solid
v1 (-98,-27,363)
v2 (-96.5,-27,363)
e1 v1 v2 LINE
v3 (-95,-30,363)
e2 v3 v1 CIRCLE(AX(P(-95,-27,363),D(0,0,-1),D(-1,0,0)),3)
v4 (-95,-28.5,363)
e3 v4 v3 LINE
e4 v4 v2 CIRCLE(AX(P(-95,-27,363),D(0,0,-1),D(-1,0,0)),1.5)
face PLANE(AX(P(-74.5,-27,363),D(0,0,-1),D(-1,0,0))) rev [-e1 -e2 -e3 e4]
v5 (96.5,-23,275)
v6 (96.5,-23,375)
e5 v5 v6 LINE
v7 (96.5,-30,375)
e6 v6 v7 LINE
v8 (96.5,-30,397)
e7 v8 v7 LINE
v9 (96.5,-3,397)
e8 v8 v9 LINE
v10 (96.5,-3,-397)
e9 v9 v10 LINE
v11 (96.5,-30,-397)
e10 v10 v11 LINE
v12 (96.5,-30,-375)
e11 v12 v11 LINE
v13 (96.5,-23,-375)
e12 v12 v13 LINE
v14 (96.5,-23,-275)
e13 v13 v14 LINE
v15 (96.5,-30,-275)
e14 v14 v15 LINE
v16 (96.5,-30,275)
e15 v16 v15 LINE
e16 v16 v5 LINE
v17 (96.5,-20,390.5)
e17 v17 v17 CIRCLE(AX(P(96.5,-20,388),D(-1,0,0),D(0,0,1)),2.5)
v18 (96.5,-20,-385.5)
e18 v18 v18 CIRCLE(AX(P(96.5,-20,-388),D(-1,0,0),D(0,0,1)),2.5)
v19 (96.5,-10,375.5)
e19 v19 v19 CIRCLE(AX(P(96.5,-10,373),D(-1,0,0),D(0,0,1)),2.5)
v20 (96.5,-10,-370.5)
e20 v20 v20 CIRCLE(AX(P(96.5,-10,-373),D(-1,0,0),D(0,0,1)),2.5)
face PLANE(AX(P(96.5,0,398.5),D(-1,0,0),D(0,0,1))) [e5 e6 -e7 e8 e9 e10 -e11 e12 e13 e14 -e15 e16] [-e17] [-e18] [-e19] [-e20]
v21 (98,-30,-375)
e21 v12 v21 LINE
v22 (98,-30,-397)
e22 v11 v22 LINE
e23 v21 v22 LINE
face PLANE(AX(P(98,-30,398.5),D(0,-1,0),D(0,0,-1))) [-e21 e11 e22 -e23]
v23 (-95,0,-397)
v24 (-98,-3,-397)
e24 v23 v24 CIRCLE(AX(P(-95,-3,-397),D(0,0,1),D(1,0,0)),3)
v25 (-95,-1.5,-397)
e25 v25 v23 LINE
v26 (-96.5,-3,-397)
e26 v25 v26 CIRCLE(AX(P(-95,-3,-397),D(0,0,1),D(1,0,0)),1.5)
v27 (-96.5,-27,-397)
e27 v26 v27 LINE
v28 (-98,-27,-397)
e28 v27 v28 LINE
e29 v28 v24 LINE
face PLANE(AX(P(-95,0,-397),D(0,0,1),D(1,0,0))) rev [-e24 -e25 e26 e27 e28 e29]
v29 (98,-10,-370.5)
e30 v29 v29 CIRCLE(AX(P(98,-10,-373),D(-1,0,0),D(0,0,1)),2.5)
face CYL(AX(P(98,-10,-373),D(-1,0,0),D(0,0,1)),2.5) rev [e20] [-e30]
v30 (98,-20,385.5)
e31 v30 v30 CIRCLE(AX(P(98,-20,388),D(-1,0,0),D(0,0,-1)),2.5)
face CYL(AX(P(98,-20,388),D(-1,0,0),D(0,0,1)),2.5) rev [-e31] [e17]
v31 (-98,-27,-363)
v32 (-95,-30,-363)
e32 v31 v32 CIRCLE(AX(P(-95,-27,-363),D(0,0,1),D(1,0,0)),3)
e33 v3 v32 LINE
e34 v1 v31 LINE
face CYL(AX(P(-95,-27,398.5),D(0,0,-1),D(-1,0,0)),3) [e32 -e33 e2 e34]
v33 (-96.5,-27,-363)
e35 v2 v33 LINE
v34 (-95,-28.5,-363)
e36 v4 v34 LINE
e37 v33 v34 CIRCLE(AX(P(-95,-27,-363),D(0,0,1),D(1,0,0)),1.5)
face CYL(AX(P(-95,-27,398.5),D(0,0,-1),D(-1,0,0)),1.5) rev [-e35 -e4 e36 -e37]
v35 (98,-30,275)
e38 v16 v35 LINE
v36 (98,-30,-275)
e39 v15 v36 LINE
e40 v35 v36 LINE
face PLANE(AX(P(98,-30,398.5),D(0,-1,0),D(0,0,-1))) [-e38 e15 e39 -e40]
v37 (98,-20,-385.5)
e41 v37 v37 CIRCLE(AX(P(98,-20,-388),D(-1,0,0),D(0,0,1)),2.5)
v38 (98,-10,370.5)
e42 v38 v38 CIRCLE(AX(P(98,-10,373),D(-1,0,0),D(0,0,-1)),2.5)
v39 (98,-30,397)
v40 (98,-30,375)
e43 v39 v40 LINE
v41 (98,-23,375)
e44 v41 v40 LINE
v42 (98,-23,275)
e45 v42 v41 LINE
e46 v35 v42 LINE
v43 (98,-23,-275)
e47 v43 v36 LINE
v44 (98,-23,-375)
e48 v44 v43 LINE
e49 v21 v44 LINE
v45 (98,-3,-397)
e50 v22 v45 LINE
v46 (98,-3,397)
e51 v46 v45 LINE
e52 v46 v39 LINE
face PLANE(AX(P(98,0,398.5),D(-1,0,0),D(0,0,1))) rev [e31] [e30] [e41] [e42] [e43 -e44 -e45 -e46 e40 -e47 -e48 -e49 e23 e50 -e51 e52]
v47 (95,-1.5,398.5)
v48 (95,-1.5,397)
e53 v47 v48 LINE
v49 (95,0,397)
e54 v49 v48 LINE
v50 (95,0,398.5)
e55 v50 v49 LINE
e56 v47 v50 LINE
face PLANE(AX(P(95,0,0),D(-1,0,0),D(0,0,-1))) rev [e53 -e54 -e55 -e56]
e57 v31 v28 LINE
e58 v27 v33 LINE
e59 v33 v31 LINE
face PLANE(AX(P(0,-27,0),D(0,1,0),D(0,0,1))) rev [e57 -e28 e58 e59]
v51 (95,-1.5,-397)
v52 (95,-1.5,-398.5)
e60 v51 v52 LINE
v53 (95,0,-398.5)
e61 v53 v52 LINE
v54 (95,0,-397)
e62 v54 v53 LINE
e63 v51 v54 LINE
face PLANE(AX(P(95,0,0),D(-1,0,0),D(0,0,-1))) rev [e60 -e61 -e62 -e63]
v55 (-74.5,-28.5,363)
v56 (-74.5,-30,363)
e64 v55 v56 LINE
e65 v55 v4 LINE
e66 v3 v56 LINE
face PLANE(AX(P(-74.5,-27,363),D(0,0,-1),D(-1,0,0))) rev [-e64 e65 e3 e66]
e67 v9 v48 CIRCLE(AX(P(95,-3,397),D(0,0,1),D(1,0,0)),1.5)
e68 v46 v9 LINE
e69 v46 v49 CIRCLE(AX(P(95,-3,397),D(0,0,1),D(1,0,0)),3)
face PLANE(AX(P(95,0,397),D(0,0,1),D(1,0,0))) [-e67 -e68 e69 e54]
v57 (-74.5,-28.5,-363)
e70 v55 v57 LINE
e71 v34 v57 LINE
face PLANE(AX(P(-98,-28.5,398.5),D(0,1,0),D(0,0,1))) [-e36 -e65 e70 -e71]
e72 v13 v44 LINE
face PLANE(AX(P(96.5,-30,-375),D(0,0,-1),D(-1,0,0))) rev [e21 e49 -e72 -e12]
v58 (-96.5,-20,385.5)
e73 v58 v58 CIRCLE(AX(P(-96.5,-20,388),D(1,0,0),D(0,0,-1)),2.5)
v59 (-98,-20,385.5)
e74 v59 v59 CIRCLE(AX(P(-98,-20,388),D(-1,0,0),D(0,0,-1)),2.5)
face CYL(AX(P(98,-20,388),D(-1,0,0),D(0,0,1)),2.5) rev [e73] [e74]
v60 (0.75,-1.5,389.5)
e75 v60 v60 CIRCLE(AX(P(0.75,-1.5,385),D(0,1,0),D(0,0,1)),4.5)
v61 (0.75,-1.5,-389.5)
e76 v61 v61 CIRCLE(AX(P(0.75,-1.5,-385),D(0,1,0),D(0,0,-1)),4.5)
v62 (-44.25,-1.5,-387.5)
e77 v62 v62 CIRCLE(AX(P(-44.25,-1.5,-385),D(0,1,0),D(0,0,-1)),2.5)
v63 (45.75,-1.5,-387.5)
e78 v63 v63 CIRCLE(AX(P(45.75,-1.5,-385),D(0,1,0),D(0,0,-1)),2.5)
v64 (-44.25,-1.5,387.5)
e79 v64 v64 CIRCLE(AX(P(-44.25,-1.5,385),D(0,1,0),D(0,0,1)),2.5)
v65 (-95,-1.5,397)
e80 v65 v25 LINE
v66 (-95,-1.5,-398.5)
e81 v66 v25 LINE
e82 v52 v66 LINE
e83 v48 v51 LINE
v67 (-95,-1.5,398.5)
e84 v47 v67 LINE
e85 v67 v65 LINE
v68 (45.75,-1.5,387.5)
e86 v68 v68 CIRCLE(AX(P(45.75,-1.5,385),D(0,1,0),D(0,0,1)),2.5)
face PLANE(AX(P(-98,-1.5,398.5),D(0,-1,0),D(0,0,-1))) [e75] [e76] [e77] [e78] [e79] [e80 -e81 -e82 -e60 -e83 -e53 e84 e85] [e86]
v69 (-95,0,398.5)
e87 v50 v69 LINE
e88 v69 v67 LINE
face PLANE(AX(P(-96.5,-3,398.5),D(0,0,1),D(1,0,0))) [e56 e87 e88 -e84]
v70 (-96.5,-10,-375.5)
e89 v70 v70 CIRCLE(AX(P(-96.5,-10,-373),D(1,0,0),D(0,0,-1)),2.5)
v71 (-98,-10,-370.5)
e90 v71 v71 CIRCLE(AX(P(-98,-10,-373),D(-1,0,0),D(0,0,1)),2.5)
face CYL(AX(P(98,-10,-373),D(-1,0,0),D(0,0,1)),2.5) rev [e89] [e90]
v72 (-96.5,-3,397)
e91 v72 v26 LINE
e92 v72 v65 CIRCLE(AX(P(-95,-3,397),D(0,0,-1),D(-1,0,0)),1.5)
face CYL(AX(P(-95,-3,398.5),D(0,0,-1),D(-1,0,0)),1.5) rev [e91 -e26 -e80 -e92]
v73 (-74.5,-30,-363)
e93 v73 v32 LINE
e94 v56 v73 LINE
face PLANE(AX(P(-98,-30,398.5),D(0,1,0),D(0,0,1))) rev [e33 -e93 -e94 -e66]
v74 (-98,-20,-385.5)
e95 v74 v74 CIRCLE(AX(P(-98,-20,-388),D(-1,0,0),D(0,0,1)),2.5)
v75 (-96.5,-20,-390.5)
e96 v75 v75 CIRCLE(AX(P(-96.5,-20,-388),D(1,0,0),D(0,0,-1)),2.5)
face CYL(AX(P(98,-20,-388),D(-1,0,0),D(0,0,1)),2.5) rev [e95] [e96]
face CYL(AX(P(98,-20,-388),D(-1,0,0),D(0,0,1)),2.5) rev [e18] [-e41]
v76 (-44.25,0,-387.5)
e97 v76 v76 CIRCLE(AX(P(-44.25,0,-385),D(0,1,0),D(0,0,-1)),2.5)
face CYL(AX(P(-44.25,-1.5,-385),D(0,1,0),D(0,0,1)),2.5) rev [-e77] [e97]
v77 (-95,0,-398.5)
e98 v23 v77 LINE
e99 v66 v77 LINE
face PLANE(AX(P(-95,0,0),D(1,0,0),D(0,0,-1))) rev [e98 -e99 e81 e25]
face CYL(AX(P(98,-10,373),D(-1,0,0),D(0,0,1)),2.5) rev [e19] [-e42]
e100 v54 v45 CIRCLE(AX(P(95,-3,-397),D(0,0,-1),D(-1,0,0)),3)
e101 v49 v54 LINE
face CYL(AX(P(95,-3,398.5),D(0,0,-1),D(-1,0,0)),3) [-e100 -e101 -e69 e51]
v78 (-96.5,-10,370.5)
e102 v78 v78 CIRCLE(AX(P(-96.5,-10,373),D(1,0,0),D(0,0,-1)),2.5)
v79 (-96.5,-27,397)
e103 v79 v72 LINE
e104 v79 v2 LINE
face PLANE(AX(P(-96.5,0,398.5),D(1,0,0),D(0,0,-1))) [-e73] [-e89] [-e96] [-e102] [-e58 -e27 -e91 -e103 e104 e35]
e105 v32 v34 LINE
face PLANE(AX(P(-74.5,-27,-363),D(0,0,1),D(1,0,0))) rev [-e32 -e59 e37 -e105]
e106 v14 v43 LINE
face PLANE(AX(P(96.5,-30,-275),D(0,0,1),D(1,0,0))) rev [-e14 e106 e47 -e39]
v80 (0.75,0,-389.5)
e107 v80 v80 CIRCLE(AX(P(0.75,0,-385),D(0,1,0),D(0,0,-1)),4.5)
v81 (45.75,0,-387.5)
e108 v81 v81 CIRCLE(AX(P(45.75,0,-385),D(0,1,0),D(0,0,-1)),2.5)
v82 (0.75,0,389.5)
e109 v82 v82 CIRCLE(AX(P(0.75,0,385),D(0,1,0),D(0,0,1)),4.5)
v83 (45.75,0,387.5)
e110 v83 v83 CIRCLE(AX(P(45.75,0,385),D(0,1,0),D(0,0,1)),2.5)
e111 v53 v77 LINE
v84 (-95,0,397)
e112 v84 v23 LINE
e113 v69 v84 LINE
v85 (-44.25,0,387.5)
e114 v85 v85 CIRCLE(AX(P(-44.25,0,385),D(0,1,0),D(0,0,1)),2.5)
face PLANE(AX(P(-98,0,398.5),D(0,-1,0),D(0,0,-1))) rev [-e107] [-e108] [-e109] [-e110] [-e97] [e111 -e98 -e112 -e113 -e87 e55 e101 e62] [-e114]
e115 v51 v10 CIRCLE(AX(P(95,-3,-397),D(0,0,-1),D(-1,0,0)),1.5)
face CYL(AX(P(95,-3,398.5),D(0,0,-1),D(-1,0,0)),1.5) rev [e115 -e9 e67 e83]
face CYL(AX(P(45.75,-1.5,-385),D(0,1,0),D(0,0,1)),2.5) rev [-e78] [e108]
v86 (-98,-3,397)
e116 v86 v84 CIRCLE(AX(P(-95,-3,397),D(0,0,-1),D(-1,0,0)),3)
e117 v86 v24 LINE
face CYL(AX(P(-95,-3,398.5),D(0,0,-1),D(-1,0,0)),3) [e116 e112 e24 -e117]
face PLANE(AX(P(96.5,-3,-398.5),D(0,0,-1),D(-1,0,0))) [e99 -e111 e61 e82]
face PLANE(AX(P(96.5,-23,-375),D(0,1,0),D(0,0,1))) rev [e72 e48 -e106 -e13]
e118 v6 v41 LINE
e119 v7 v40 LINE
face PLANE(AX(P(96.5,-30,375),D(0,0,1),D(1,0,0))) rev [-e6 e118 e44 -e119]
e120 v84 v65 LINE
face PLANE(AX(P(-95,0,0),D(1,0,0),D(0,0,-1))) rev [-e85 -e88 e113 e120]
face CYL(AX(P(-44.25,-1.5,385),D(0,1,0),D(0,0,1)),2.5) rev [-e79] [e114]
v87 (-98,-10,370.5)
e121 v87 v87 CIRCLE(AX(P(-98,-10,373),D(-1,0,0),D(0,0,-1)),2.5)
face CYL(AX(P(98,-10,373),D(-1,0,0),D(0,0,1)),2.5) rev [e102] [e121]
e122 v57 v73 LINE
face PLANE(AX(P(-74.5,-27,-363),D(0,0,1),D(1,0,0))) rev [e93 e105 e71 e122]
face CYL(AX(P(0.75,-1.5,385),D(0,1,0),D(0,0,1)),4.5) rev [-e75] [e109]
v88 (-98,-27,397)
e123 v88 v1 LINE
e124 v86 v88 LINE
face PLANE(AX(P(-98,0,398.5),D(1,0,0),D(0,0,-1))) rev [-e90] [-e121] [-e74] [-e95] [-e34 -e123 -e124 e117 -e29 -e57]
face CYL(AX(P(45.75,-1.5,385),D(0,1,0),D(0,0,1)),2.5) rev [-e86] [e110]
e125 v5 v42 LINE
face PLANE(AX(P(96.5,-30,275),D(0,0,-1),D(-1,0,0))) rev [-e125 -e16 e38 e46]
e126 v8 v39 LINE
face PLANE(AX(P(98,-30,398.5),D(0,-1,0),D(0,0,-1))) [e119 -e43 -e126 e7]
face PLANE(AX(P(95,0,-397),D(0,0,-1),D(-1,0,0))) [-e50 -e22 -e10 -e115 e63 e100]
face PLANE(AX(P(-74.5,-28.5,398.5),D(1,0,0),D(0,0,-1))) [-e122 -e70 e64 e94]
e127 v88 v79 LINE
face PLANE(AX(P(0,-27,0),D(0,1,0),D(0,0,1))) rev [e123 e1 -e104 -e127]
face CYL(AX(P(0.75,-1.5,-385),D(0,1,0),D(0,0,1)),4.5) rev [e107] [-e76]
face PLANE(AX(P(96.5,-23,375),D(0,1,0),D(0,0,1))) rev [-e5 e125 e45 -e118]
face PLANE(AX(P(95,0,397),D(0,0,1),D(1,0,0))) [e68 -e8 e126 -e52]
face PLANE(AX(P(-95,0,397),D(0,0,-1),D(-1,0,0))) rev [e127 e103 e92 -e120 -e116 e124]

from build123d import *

# Parameters (mm, degrees)
SM_BASE_FLANGE_1_DEPTH = 398.5
SKETCH_6_W             = 1.5
SKETCH_6_H             = 30
CUT_EXTRUDE_1_DEPTH    = 3
SKETCH_7_W             = 23.5
SKETCH_7_H             = 35.5
CUT_EXTRUDE_2_DEPTH    = 3
SKETCH_8_R             = 2.5
CUT_EXTRUDE_3_DEPTH    = 446.104762949
SKETCH_10_R            = 2.5
SKETCH_10_R_2          = 4.5
CUT_EXTRUDE_4_DEPTH    = 10
SKETCH_11_W            = 100
SKETCH_11_H            = 7
CUT_EXTRUDE_2108_DEPTH = 10


# Sheet-metal steps are written as plain solids
with BuildPart() as part:
    # Sketch 1 → Базовая кромка1 (new, symmetric)
    with BuildSketch(Plane.XY):
        with BuildLine():
            Line((-74.5, -30), (-95, -30))
            ThreePointArc((-95, -30), (-97.121320344, -29.121320344), (-98, -27))
            Line((-98, -27), (-98, -3))
            ThreePointArc((-98, -3), (-97.121320344, -0.878679656), (-95, 0))
            Line((-95, 0), (95, 0))
            ThreePointArc((95, 0), (97.121320344, -0.878679656), (98, -3))
            Line((98, -3), (98, -30))
            Line((98, -30), (96.5, -30))
            Line((96.5, -30), (96.5, -3))
            ThreePointArc((96.5, -3), (96.060660172, -1.939339828), (95, -1.5))
            Line((95, -1.5), (-95, -1.5))
            ThreePointArc((-95, -1.5), (-96.060660172, -1.939339828), (-96.5, -3))
            Line((-96.5, -3), (-96.5, -27))
            ThreePointArc((-96.5, -27), (-96.060660172, -28.060660172), (-95, -28.5))
            Line((-95, -28.5), (-74.5, -28.5))
            Line((-74.5, -28.5), (-74.5, -30))
        make_face()
    extrude(amount=SM_BASE_FLANGE_1_DEPTH, both=True)

    # Эскиз6 → Вырез-Вытянуть1 (cut)
    with BuildSketch(Plane.ZY.offset(98)):
        with Locations((397.75, -15)):
            Rectangle(SKETCH_6_W, SKETCH_6_H)
        with Locations((-397.75, -15)):
            Rectangle(SKETCH_6_W, SKETCH_6_H)
    cut_extrude_1 = extrude(amount=-CUT_EXTRUDE_1_DEPTH, mode=Mode.SUBTRACT)

    # Зеркальное отражение1: Вырез-Вытянуть1 across plane
    add(cut_extrude_1.mirror(Plane(origin=(0, 0, 0), x_dir=(0, 0, 1), z_dir=(1, 0, 0))), mode=Mode.SUBTRACT)

    # Эскиз7 → Вырез-Вытянуть2 (cut)
    with BuildSketch(Plane.XZ.offset(30)):
        with Locations((-86.25, 380.75)):
            Rectangle(SKETCH_7_W, SKETCH_7_H)
        with Locations((-86.25, -380.75)):
            Rectangle(SKETCH_7_W, SKETCH_7_H)
    extrude(amount=-CUT_EXTRUDE_2_DEPTH, mode=Mode.SUBTRACT)

    # Эскиз8 → Вырез-Вытянуть3 (cut, through all)
    with BuildSketch(Plane.ZY.offset(98)):
        with Locations((-388, -20)):
            Circle(SKETCH_8_R)
        with Locations((-373, -10)):
            Circle(SKETCH_8_R)
        with Locations(Location((373, -10, 0), (0, 0, 180))):
            Circle(SKETCH_8_R)
        with Locations(Location((388, -20, 0), (0, 0, 180))):
            Circle(SKETCH_8_R)
    extrude(amount=-CUT_EXTRUDE_3_DEPTH, mode=Mode.SUBTRACT)

    # Эскиз10 → Вырез-Вытянуть4 (cut)
    with BuildSketch(Plane(origin=(0, 0, 0), x_dir=(1, 0, 0), z_dir=(0, 1, 0))):
        with Locations(Location((-44.25, -385, 0), (0, 0, 270))):
            Circle(SKETCH_10_R)
        with Locations(Location((0.75, -385, 0), (0, 0, 270))):
            Circle(SKETCH_10_R_2)
        with Locations(Location((45.75, -385, 0), (0, 0, 270))):
            Circle(SKETCH_10_R)
        with Locations(Location((45.75, 385, 0), (0, 0, 90))):
            Circle(SKETCH_10_R)
        with Locations(Location((0.75, 385, 0), (0, 0, 90))):
            Circle(SKETCH_10_R_2)
        with Locations(Location((-44.25, 385, 0), (0, 0, 90))):
            Circle(SKETCH_10_R)
    extrude(amount=-CUT_EXTRUDE_4_DEPTH, mode=Mode.SUBTRACT)

    # Эскиз11 → Cut-Extrude 2108 (cut)
    with BuildSketch(Plane(origin=(98, 0, 0), x_dir=(0, 0, -1), z_dir=(1, 0, 0))):
        with Locations((325, -26.5)):
            Rectangle(SKETCH_11_W, SKETCH_11_H)
        with Locations((-325, -26.5)):
            Rectangle(SKETCH_11_W, SKETCH_11_H)
    extrude(amount=-CUT_EXTRUDE_2108_DEPTH, mode=Mode.SUBTRACT)


solid = part.part
